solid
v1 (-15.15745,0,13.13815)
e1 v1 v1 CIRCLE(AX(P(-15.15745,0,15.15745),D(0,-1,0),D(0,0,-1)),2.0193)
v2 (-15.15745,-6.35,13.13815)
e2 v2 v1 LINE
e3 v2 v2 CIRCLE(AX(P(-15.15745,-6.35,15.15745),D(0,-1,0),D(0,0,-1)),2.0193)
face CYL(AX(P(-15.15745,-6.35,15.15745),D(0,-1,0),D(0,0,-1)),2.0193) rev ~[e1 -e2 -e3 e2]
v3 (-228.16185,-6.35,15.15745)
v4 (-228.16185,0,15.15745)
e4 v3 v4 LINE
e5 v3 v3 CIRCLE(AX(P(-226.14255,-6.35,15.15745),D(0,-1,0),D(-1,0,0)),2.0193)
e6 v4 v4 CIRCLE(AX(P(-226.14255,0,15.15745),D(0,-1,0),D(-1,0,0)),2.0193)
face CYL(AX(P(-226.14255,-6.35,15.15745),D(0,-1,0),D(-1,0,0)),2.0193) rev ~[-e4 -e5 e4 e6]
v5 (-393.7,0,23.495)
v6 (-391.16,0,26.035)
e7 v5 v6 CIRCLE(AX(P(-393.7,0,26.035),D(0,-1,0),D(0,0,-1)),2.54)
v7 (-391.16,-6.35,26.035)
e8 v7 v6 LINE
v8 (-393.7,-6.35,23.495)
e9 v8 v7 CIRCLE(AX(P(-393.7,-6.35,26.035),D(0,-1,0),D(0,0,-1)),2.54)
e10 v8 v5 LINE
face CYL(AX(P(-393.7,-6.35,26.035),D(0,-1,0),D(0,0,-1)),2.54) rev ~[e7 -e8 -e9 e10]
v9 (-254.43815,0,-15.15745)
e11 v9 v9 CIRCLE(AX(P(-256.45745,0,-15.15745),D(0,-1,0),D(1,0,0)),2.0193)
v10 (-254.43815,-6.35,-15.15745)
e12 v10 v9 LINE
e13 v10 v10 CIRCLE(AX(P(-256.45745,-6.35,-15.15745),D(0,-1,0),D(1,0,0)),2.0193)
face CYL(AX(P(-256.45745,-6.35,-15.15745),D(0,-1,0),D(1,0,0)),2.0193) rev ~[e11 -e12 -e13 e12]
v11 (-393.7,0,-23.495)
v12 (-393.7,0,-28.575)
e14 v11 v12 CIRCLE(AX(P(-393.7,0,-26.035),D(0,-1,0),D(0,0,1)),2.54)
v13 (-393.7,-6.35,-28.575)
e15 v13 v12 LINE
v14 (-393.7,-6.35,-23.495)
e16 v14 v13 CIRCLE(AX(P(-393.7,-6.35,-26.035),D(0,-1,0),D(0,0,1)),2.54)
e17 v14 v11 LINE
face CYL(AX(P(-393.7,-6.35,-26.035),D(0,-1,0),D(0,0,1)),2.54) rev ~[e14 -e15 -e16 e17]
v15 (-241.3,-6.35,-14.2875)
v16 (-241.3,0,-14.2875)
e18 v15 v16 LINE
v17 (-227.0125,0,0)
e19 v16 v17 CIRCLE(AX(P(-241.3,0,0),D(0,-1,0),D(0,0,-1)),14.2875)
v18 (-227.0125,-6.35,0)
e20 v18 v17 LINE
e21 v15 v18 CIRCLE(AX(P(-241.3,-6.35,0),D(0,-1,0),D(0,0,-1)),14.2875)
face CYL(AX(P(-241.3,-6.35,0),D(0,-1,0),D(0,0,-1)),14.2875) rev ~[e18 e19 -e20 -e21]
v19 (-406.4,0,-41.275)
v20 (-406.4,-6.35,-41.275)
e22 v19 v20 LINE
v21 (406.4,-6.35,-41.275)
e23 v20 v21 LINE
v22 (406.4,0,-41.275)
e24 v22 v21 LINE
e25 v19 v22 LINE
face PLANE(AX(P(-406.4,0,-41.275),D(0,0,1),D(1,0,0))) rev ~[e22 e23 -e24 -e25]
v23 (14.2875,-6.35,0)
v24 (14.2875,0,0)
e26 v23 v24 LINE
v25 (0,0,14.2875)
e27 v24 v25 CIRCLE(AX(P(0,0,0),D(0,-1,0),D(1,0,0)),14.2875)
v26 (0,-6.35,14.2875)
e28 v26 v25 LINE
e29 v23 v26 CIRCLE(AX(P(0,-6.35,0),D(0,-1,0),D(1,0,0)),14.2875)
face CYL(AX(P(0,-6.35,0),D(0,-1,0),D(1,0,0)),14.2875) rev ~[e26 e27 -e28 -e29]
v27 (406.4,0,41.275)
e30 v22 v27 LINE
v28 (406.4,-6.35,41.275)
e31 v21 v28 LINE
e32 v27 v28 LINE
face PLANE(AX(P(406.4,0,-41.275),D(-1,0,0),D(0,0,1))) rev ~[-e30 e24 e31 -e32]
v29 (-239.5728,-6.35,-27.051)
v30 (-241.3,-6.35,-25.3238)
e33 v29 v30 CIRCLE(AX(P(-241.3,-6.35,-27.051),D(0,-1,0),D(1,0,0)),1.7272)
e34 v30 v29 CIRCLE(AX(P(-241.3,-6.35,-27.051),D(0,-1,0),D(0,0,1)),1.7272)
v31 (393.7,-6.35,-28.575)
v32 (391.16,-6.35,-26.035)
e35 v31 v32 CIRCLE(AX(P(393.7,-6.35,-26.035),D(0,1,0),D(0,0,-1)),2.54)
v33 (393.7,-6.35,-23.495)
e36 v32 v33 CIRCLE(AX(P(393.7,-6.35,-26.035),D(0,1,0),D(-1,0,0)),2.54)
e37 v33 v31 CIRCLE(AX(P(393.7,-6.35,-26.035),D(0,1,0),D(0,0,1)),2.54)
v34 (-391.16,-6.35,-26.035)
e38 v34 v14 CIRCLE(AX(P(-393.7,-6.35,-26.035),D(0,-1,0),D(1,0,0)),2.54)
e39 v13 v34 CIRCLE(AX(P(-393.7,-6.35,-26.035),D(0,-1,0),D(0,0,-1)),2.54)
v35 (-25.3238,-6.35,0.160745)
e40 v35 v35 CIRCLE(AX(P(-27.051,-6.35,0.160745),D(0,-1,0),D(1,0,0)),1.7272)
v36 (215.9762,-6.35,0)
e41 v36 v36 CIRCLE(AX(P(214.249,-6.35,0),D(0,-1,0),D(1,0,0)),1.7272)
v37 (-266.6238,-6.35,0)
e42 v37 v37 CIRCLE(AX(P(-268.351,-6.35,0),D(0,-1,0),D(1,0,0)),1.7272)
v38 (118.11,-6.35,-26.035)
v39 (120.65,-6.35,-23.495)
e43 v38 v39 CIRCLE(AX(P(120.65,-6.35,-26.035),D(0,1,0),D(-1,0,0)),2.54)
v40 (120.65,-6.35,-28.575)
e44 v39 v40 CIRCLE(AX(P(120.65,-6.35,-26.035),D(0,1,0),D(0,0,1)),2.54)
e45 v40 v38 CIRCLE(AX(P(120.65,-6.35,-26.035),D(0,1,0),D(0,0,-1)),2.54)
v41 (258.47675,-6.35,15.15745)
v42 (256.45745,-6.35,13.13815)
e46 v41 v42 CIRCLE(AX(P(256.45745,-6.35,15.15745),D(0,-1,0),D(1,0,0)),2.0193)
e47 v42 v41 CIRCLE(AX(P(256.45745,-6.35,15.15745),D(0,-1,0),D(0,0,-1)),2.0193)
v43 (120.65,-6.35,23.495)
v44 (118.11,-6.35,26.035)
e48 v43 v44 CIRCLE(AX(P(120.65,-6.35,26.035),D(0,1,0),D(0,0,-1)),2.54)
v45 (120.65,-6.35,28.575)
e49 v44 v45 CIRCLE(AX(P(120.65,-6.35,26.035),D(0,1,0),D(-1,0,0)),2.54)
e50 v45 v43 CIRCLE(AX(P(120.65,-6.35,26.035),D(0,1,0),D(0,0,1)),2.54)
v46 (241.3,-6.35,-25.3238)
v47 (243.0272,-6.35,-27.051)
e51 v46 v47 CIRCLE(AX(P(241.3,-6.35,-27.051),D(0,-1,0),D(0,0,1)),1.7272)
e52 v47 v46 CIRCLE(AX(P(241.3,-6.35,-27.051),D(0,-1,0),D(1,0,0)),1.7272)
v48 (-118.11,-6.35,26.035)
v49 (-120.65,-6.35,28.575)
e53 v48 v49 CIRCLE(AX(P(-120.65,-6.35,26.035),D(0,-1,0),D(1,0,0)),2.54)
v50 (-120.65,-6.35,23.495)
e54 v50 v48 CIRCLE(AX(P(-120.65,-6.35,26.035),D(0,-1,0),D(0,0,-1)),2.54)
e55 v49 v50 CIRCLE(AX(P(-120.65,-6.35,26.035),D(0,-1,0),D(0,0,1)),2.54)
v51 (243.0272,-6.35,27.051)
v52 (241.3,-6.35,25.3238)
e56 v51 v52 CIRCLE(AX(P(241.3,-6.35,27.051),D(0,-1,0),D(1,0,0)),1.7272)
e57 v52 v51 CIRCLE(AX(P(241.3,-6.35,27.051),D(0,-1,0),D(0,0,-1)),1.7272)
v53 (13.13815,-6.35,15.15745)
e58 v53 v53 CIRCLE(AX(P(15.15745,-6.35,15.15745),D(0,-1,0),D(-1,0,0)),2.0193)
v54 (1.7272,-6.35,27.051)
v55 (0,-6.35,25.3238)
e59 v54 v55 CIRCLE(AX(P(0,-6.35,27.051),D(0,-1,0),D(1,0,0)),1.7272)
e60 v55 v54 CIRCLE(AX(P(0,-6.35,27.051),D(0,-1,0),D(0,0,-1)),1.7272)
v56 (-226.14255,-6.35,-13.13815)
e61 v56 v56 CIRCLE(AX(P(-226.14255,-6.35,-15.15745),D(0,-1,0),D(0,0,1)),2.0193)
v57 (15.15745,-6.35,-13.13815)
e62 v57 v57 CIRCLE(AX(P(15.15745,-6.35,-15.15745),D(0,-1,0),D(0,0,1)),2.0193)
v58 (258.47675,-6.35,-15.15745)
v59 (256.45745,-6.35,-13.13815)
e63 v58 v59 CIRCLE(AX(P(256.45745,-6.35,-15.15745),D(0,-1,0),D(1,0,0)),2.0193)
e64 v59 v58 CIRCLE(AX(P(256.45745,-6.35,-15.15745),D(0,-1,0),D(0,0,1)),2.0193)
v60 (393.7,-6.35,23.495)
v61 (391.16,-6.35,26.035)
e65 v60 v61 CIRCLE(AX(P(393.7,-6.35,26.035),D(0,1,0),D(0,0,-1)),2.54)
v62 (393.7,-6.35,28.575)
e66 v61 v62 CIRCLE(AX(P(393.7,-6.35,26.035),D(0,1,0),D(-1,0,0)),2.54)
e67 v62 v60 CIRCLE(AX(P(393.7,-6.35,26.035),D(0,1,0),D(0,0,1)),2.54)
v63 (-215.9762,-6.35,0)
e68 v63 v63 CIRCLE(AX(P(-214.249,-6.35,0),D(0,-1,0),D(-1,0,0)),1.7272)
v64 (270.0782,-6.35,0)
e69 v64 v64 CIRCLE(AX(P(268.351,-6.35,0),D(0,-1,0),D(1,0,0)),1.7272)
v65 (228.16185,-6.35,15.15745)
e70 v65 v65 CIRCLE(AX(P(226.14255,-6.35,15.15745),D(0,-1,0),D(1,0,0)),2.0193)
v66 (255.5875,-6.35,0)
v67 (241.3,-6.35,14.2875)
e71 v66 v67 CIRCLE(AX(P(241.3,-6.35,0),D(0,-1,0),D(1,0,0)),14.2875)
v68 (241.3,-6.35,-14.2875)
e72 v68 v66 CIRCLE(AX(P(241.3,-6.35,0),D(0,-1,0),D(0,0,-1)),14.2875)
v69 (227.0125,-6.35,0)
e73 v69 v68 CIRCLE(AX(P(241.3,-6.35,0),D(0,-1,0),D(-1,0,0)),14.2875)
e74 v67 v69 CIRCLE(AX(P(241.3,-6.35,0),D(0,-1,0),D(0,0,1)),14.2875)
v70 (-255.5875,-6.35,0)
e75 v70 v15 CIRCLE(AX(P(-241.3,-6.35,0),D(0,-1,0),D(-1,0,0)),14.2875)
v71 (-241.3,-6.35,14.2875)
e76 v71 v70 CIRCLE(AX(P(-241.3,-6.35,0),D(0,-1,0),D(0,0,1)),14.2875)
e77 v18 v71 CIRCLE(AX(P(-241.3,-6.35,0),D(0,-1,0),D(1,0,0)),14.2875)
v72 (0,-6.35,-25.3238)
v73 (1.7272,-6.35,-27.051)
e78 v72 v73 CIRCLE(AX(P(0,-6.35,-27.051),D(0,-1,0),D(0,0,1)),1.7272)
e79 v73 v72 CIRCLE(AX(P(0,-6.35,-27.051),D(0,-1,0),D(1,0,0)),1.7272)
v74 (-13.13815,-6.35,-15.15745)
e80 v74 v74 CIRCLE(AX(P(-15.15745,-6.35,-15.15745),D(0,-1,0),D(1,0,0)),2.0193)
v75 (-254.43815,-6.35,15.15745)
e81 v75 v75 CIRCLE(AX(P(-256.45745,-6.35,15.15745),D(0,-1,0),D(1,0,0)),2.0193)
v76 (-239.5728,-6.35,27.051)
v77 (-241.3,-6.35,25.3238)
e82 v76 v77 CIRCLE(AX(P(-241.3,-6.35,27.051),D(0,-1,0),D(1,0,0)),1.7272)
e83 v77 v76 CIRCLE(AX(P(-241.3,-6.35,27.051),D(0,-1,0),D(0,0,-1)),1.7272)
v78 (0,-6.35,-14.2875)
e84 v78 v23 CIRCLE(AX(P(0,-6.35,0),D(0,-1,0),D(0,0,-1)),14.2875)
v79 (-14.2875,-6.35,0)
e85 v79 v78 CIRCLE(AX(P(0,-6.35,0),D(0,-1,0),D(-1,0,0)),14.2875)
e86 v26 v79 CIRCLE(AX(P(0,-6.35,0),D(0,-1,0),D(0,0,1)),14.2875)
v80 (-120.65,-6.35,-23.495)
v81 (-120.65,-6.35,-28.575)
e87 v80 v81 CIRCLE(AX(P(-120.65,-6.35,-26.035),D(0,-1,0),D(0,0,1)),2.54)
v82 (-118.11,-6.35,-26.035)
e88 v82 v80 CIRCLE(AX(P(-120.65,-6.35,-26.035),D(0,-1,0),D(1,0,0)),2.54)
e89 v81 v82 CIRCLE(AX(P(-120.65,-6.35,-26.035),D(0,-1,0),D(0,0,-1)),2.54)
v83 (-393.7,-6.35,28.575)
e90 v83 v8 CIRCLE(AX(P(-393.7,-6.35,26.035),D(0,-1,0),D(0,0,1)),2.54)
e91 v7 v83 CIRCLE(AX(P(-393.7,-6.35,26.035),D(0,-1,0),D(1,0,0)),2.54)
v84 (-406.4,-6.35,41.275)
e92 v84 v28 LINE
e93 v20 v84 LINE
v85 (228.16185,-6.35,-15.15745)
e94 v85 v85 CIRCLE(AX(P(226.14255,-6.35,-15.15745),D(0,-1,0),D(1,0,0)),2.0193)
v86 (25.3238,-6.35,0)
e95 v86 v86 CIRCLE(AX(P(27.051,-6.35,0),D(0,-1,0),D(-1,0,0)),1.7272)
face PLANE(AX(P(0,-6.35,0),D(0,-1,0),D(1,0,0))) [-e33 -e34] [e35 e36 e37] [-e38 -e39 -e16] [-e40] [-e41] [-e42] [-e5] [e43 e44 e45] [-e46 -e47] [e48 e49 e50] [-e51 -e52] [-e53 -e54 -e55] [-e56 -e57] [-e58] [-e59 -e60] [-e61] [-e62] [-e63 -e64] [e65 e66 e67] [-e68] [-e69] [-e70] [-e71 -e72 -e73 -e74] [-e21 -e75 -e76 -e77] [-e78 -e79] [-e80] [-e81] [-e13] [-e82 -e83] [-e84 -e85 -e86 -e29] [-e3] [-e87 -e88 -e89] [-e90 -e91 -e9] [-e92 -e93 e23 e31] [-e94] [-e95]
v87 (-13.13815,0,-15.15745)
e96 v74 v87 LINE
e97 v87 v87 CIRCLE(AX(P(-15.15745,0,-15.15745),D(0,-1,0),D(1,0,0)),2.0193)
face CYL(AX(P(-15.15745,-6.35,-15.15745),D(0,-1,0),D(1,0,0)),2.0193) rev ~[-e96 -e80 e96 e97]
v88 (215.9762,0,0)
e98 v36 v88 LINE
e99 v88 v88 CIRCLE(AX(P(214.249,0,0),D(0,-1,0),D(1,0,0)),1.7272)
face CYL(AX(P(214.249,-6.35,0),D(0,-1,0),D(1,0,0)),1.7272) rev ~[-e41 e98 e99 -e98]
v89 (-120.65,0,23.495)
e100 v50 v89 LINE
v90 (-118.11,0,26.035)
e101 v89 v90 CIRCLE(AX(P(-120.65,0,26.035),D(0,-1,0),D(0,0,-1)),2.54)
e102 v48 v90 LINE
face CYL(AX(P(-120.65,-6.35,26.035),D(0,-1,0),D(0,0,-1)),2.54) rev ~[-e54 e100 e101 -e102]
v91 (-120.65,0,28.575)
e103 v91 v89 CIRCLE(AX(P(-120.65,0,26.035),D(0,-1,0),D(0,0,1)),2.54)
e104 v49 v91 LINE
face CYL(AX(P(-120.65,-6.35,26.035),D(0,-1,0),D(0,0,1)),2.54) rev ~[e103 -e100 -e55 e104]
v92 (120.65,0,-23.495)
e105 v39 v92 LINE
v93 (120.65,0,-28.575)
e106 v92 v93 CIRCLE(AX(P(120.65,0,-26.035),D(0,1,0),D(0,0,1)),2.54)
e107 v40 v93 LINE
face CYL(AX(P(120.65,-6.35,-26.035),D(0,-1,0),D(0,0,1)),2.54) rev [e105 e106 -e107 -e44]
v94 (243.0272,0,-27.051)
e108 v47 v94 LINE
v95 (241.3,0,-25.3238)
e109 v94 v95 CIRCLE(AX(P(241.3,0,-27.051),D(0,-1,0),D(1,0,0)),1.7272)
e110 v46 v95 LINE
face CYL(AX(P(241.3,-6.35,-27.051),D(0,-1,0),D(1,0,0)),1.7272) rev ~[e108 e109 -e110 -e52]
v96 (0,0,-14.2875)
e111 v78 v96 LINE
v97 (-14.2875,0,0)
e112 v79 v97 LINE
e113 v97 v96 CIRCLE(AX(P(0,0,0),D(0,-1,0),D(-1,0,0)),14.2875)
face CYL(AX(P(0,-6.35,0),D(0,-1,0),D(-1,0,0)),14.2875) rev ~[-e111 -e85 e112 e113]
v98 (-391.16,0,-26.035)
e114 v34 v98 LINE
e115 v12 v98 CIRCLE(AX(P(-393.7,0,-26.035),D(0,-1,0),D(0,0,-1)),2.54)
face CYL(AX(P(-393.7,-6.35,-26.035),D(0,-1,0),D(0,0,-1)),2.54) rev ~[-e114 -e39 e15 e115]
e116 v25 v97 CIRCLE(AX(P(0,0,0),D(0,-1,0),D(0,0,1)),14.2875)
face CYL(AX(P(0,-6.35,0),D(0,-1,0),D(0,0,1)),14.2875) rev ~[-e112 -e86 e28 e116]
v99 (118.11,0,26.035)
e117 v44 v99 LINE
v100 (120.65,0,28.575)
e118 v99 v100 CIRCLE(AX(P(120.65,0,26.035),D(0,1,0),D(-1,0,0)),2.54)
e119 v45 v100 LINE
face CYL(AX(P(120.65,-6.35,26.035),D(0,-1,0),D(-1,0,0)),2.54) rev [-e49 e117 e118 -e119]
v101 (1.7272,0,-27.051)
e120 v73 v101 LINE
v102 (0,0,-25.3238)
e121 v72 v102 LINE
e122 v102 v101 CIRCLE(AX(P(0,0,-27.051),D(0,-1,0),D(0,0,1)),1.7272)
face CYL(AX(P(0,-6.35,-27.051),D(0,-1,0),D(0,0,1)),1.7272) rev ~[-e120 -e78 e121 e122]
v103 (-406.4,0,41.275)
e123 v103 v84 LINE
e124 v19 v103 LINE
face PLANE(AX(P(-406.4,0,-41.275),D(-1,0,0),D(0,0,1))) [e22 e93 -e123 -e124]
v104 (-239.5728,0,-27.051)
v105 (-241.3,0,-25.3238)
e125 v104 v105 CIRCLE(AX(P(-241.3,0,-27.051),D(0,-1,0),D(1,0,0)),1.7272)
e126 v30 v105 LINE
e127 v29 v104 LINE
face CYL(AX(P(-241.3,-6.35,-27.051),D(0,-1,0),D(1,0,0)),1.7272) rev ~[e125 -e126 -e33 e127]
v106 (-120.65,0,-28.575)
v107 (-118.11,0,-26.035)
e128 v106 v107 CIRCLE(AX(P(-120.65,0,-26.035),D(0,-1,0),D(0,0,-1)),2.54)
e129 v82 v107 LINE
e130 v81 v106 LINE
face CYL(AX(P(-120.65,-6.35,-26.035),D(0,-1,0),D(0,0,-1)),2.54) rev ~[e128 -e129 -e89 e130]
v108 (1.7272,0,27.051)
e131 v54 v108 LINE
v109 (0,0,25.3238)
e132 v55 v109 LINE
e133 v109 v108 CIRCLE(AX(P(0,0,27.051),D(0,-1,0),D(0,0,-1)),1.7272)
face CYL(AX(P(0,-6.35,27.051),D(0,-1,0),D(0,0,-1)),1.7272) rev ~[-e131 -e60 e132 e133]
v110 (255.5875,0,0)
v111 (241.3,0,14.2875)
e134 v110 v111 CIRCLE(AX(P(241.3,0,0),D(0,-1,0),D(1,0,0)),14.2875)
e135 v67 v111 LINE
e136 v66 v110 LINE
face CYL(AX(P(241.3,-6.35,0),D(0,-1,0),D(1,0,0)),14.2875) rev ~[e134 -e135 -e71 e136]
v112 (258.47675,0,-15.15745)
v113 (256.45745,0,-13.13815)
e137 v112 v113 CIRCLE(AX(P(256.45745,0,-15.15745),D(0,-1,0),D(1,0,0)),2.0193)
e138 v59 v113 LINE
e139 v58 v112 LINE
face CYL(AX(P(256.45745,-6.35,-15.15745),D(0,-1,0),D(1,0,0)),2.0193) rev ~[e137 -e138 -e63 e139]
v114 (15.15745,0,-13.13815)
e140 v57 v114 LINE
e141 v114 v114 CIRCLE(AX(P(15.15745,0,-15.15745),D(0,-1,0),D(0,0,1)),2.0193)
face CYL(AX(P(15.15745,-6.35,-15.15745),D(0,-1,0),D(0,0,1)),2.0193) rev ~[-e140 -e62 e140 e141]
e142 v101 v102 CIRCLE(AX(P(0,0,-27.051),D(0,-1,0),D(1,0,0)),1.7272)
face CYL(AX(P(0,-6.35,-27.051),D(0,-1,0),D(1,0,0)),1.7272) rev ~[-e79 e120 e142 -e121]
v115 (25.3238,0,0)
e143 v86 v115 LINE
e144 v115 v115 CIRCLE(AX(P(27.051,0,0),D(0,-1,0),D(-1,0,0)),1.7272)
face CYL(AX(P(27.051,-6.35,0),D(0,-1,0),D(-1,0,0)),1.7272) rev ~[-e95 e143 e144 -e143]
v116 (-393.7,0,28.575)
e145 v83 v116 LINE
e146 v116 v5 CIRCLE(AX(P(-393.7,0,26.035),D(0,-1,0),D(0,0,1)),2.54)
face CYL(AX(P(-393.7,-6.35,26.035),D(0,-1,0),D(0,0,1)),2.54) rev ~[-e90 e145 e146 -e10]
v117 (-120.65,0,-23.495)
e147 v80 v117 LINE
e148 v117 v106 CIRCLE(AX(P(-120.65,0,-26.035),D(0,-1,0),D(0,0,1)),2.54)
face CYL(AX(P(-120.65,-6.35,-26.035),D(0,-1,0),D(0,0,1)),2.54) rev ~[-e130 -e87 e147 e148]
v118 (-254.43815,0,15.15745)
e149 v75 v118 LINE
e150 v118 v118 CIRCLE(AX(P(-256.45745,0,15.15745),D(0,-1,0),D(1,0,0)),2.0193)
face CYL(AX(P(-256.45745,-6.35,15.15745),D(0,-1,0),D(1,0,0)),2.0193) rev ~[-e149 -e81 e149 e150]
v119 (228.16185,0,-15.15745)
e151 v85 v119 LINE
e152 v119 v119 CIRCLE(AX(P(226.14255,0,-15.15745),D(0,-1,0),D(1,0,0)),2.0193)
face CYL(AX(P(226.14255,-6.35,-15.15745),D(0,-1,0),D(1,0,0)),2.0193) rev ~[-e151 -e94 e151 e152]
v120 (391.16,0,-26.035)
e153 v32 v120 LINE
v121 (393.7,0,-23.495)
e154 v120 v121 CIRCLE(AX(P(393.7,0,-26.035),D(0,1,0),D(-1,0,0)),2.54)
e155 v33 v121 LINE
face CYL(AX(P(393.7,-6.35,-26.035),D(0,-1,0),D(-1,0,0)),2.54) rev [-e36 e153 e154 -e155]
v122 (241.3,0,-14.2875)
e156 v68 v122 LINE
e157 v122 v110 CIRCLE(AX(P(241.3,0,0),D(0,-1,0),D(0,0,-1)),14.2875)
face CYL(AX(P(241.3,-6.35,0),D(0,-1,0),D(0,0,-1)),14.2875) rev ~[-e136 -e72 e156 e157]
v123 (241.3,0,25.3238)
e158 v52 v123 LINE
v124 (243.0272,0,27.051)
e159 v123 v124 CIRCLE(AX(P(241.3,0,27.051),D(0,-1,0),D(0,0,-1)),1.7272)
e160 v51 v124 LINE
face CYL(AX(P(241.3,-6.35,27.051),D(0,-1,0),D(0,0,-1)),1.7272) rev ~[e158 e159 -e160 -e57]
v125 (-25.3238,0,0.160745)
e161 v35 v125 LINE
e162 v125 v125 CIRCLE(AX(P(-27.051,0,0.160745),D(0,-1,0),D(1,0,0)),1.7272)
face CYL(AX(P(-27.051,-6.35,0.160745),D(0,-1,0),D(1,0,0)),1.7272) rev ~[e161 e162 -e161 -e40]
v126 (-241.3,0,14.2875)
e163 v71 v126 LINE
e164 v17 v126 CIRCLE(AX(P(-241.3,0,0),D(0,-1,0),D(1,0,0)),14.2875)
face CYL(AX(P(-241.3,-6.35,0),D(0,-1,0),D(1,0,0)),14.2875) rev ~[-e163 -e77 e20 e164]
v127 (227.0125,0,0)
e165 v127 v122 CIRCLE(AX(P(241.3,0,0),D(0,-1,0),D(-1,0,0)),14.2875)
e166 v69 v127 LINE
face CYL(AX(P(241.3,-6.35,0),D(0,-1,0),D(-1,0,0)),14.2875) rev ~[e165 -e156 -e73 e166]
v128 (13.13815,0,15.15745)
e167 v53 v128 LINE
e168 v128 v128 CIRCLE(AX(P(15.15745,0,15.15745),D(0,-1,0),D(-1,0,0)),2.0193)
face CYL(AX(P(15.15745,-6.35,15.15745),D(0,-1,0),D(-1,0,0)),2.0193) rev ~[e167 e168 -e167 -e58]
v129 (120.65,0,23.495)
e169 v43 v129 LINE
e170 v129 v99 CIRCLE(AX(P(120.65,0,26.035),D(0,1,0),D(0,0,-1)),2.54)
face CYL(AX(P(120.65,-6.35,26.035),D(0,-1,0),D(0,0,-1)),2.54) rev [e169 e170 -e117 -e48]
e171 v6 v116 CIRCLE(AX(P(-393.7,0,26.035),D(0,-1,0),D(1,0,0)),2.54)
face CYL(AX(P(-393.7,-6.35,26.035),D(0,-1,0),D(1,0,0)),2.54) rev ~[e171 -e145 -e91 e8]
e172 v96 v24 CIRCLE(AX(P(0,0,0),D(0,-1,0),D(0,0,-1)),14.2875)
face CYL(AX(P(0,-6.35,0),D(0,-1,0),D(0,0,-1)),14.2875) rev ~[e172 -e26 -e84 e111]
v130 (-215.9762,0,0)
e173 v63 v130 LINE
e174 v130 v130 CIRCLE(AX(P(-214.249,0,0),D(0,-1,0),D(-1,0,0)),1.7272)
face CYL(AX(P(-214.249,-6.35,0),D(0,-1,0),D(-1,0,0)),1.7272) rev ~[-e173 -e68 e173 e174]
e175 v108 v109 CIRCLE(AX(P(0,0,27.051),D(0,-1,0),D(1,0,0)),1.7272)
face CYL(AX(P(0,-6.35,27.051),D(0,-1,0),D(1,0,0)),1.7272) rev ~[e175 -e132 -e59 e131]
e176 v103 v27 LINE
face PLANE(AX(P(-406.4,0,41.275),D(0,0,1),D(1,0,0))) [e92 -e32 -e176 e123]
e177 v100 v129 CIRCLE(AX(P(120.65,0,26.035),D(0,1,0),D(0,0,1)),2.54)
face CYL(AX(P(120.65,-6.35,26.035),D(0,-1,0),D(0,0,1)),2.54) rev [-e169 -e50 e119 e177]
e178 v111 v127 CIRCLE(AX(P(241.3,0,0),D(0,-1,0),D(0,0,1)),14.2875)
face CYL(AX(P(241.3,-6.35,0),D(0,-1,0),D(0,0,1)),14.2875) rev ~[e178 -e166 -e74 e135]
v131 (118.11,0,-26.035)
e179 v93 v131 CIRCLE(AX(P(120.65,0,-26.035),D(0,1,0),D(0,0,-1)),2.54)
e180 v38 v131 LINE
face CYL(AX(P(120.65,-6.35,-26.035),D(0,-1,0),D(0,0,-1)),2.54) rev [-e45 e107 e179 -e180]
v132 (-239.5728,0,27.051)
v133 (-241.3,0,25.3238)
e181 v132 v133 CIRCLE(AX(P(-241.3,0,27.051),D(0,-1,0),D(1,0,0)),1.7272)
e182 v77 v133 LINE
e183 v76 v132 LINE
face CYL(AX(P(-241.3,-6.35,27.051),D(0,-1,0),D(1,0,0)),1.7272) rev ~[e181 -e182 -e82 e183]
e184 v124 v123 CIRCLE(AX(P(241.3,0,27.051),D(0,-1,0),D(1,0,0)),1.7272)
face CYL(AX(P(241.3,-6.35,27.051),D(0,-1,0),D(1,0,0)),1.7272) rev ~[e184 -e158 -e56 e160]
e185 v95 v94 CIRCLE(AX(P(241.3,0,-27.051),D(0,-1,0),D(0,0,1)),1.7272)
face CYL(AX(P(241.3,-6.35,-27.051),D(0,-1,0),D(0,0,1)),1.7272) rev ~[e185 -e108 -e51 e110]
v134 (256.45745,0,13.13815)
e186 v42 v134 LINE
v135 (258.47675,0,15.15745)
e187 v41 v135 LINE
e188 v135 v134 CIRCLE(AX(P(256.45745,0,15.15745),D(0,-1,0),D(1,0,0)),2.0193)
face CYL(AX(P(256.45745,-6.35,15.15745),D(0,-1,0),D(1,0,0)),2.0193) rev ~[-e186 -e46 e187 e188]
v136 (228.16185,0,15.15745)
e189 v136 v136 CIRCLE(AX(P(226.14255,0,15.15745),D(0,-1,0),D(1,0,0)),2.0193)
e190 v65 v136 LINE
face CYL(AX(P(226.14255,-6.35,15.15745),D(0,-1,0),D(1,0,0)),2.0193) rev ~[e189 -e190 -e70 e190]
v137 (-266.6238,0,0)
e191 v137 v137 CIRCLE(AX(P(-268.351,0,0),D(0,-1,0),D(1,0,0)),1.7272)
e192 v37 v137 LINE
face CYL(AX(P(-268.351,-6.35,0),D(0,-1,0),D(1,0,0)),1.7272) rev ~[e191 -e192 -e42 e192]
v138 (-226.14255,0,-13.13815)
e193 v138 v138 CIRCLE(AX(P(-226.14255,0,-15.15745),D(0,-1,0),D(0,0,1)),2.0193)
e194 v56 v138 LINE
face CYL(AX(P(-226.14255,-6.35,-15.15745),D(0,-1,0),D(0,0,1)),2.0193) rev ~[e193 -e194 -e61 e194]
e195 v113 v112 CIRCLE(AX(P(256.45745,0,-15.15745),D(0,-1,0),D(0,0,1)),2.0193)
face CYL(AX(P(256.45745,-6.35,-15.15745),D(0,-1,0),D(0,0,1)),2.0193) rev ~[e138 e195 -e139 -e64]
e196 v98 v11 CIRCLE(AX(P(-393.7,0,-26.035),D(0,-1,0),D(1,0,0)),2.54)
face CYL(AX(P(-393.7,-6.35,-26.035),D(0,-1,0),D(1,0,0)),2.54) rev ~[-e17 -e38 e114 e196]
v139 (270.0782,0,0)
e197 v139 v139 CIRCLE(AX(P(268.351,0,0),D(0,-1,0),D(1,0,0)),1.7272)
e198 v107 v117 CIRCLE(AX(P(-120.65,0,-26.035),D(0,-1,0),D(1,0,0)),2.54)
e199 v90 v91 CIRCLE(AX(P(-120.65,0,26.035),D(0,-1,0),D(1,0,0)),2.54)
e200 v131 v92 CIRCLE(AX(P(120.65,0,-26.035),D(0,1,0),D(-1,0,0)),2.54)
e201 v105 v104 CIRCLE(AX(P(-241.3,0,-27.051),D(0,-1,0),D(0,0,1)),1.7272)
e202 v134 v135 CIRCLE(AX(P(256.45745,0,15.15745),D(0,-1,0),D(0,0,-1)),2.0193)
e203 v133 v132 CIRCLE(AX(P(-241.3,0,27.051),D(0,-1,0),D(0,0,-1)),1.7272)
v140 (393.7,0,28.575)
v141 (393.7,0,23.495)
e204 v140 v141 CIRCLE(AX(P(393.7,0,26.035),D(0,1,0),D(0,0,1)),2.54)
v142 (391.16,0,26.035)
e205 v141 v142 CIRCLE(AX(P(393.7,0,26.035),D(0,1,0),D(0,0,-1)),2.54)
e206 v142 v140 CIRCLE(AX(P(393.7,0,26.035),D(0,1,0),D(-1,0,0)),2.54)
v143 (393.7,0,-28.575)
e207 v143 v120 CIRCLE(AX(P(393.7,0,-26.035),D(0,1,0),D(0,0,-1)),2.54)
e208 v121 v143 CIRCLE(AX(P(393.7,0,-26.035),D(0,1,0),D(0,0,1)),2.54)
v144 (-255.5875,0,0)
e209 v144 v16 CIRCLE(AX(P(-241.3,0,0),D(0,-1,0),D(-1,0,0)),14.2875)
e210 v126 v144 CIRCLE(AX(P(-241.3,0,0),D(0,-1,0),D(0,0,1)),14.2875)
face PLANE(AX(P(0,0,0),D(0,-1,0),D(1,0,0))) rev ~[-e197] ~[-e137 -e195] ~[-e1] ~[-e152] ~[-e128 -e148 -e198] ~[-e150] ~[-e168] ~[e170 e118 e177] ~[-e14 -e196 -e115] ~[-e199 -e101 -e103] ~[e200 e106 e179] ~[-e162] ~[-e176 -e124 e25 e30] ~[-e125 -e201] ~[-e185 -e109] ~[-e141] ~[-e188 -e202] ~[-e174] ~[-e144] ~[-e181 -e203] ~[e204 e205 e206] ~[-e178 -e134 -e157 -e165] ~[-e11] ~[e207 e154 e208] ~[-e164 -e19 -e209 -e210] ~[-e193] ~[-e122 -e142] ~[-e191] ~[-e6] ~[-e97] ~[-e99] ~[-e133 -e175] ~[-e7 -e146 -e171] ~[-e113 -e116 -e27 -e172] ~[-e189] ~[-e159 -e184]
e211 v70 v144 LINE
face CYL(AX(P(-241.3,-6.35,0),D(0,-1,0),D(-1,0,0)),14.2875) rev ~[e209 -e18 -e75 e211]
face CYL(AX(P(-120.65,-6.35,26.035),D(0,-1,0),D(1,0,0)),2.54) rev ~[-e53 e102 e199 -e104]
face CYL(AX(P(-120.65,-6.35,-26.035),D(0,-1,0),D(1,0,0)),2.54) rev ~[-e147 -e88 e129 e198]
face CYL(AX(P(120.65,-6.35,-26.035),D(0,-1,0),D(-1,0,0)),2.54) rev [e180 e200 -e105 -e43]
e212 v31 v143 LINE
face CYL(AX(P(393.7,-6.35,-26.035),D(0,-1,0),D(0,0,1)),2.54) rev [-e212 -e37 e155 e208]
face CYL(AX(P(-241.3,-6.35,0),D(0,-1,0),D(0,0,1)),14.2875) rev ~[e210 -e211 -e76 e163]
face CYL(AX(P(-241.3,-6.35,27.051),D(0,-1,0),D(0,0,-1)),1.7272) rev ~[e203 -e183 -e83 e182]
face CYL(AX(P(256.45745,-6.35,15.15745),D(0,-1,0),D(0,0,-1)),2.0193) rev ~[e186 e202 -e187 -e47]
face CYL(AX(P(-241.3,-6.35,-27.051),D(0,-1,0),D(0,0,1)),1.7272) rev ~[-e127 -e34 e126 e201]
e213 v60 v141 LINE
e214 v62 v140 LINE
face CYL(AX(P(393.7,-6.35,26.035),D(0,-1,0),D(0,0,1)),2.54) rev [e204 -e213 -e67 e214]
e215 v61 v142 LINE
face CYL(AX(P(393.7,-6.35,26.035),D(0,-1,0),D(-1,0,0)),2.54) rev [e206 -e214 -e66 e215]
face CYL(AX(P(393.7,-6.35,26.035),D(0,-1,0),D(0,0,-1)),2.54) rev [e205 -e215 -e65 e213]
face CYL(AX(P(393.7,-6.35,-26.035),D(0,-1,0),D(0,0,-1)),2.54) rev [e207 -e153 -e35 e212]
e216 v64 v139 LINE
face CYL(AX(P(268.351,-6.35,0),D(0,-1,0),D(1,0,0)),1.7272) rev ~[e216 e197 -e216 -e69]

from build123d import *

# Parameters (mm, degrees)
F0_W     = 812.8
F0_H     = 82.55
F1_DEPTH = 6.35
F2_R     = 1.7272
F3_DEPTH = 6.35
F5_DEPTH = 6.35


# Not quite as in the source:
# - a pattern or mirror of a feature is missing from the dataset's text; its kind, count and spacing are read off the source's solid


with BuildPart() as f1:
    # F0 (on Front) → F1 (new body)
    with BuildSketch(Plane.XZ):
        Rectangle(F0_W, F0_H)
    extrude(amount=F1_DEPTH)

    # F2 (on face) → F3 (cut, through all)
    with BuildSketch(Plane.XZ.offset(6.35)):
        with BuildLine():
            Line((-227.0125, 0), (-241.3, 0))
            Line((-241.3, 0), (-241.3, -14.2875))
            ThreePointArc((-241.3, -14.2875), (-231.1972118638, -10.1027881362), (-227.0125, 0))
        make_face()
        with BuildLine():
            Line((-241.3, 14.2875), (-241.3, 0))
            Line((-241.3, 0), (-227.0125, 0))
            ThreePointArc((-227.0125, 0), (-231.1972118638, 10.1027881362), (-241.3, 14.2875))
        make_face()
        with BuildLine():
            ThreePointArc((-241.3, 14.2875), (-251.4027881362, 10.1027881362), (-255.5875, 0))
            Line((-255.5875, 0), (-241.3, 0))
            Line((-241.3, 0), (-241.3, 14.2875))
        make_face()
        with BuildLine():
            Line((-241.3, 0), (-255.5875, 0))
            ThreePointArc((-255.5875, 0), (-251.4027881362, -10.1027881362), (-241.3, -14.2875))
            Line((-241.3, -14.2875), (-241.3, 0))
        make_face()
        with BuildLine():
            Line((-256.45745, -15.15745), (-256.45745, -13.13815))
            ThreePointArc((-256.45745, -13.13815), (-257.8853107233, -16.5853107232), (-254.43815, -15.15745))
            Line((-254.43815, -15.15745), (-256.45745, -15.15745))
        make_face()
        with BuildLine():
            ThreePointArc((-254.43815, -15.15745), (-255.0295892767, -13.7295892768), (-256.45745, -13.13815))
            Line((-256.45745, -13.13815), (-256.45745, -15.15745))
            Line((-256.45745, -15.15745), (-254.43815, -15.15745))
        make_face()
        with BuildLine():
            ThreePointArc((-239.5728, -27.051), (-240.0786851675, -25.8296851675), (-241.3, -25.3238))
            ThreePointArc((-241.3, -25.3238), (-242.5213148325, -28.2723148325), (-239.5728, -27.051))
        make_face()
        with BuildLine():
            Line((-226.14255, -15.15745), (-228.16185, -15.15745))
            ThreePointArc((-228.16185, -15.15745), (-226.14255, -17.17675), (-224.12325, -15.15745))
            ThreePointArc((-224.12325, -15.15745), (-224.7146892767, -13.7295892768), (-226.14255, -13.13815))
            Line((-226.14255, -13.13815), (-226.14255, -15.15745))
        make_face()
        with BuildLine():
            ThreePointArc((-226.14255, -13.13815), (-227.5704107232, -13.7295892767), (-228.16185, -15.15745))
            Line((-228.16185, -15.15745), (-226.14255, -15.15745))
            Line((-226.14255, -15.15745), (-226.14255, -13.13815))
        make_face()
        with BuildLine():
            ThreePointArc((-224.12325, 15.15745), (-226.14255, 17.17675), (-228.16185, 15.15745))
            Line((-228.16185, 15.15745), (-226.14255, 15.15745))
            Line((-226.14255, 15.15745), (-226.14255, 13.13815))
            ThreePointArc((-226.14255, 13.13815), (-224.7146892767, 13.7295892768), (-224.12325, 15.15745))
        make_face()
        with BuildLine():
            Line((-226.14255, 15.15745), (-228.16185, 15.15745))
            ThreePointArc((-228.16185, 15.15745), (-227.5704107232, 13.7295892767), (-226.14255, 13.13815))
            Line((-226.14255, 13.13815), (-226.14255, 15.15745))
        make_face()
        with BuildLine():
            ThreePointArc((-212.5218, 0), (-214.249, 1.7272), (-215.9762, 0))
            ThreePointArc((-215.9762, 0), (-214.249, -1.7272), (-212.5218, 0))
        make_face()
        with BuildLine():
            ThreePointArc((-239.5728, 27.051), (-242.5213148325, 28.2723148325), (-241.3, 25.3238))
            ThreePointArc((-241.3, 25.3238), (-240.0786851675, 25.8296851675), (-239.5728, 27.051))
        make_face()
        with BuildLine():
            Line((-256.45745, 15.15745), (-256.45745, 13.13815))
            ThreePointArc((-256.45745, 13.13815), (-255.0295892767, 13.7295892768), (-254.43815, 15.15745))
            Line((-254.43815, 15.15745), (-256.45745, 15.15745))
        make_face()
        with BuildLine():
            ThreePointArc((-254.43815, 15.15745), (-257.8853107233, 16.5853107232), (-256.45745, 13.13815))
            Line((-256.45745, 13.13815), (-256.45745, 15.15745))
            Line((-256.45745, 15.15745), (-254.43815, 15.15745))
        make_face()
        with BuildLine():
            ThreePointArc((-270.0782, 0), (-268.351, -1.7272), (-266.6238, 0))
            Line((-266.6238, 0), (-270.0782, 0))
        make_face()
        with BuildLine():
            Line((-270.0782, 0), (-266.6238, 0))
            ThreePointArc((-266.6238, 0), (-268.351, 1.7272), (-270.0782, 0))
        make_face()
        with BuildLine():
            Line((14.2875, 0), (0, 0))
            Line((0, 0), (0, -14.2875))
            ThreePointArc((0, -14.2875), (10.1027881362, -10.1027881362), (14.2875, 0))
        make_face()
        with BuildLine():
            Line((0, -14.2875), (0, 0))
            Line((0, 0), (-14.2875, 0))
            ThreePointArc((-14.2875, 0), (-10.1027881362, -10.1027881362), (0, -14.2875))
        make_face()
        with BuildLine():
            Line((-14.2875, 0), (0, 0))
            Line((0, 0), (0, 14.2875))
            ThreePointArc((0, 14.2875), (-10.1027881362, 10.1027881362), (-14.2875, 0))
        make_face()
        with BuildLine():
            Line((0, 14.2875), (0, 0))
            Line((0, 0), (14.2875, 0))
            ThreePointArc((14.2875, 0), (10.1027881362, 10.1027881362), (0, 14.2875))
        make_face()
        with BuildLine():
            Line((15.15745, 15.15745), (15.15745, 13.13815))
            ThreePointArc((15.15745, 13.13815), (16.5853107233, 13.7295892768), (17.17675, 15.15745))
            ThreePointArc((17.17675, 15.15745), (15.15745, 17.17675), (13.13815, 15.15745))
            Line((13.13815, 15.15745), (15.15745, 15.15745))
        make_face()
        with BuildLine():
            ThreePointArc((13.13815, 15.15745), (13.7295892768, 13.7295892767), (15.15745, 13.13815))
            Line((15.15745, 13.13815), (15.15745, 15.15745))
            Line((15.15745, 15.15745), (13.13815, 15.15745))
        make_face()
        with BuildLine():
            ThreePointArc((1.7272, 27.051), (-1.2213148325, 28.2723148325), (0, 25.3238))
            ThreePointArc((0, 25.3238), (1.2213148325, 25.8296851675), (1.7272, 27.051))
        make_face()
        with BuildLine():
            Line((-15.15745, 15.15745), (-13.13815, 15.15745))
            ThreePointArc((-13.13815, 15.15745), (-16.5853107233, 16.5853107232), (-15.15745, 13.13815))
            Line((-15.15745, 13.13815), (-15.15745, 15.15745))
        make_face()
        with BuildLine():
            ThreePointArc((-15.15745, 13.13815), (-13.7295892767, 13.7295892768), (-13.13815, 15.15745))
            Line((-13.13815, 15.15745), (-15.15745, 15.15745))
            Line((-15.15745, 15.15745), (-15.15745, 13.13815))
        make_face()
        with BuildLine():
            ThreePointArc((-15.15745, -13.13815), (-16.5853107233, -16.5853107232), (-13.13815, -15.15745))
            Line((-13.13815, -15.15745), (-15.15745, -15.15745))
            Line((-15.15745, -15.15745), (-15.15745, -13.13815))
        make_face()
        with BuildLine():
            Line((-15.15745, -15.15745), (-13.13815, -15.15745))
            ThreePointArc((-13.13815, -15.15745), (-13.7295892767, -13.7295892768), (-15.15745, -13.13815))
            Line((-15.15745, -13.13815), (-15.15745, -15.15745))
        make_face()
        with BuildLine():
            ThreePointArc((1.7272, -27.051), (1.2213148325, -25.8296851675), (0, -25.3238))
            ThreePointArc((0, -25.3238), (-1.2213148325, -28.2723148325), (1.7272, -27.051))
        make_face()
        with BuildLine():
            ThreePointArc((17.17675, -15.15745), (16.5853107233, -13.7295892768), (15.15745, -13.13815))
            Line((15.15745, -13.13815), (15.15745, -15.15745))
            Line((15.15745, -15.15745), (13.13815, -15.15745))
            ThreePointArc((13.13815, -15.15745), (15.15745, -17.17675), (17.17675, -15.15745))
        make_face()
        with BuildLine():
            Line((15.15745, -15.15745), (15.15745, -13.13815))
            ThreePointArc((15.15745, -13.13815), (13.7295892768, -13.7295892767), (13.13815, -15.15745))
            Line((13.13815, -15.15745), (15.15745, -15.15745))
        make_face()
        with Locations((-27.051, 0.1607450395)):
            Circle(F2_R)
        with BuildLine():
            ThreePointArc((28.7782, 0), (27.051, 1.7272), (25.3238, 0))
            ThreePointArc((25.3238, 0), (27.051, -1.7272), (28.7782, 0))
        make_face()
        with BuildLine():
            ThreePointArc((241.3, -14.2875), (251.4027881362, -10.1027881362), (255.5875, 0))
            Line((255.5875, 0), (241.3, 0))
            Line((241.3, 0), (241.3, -14.2875))
        make_face()
        with BuildLine():
            Line((241.3, 0), (255.5875, 0))
            ThreePointArc((255.5875, 0), (251.4027881362, 10.1027881362), (241.3, 14.2875))
            Line((241.3, 14.2875), (241.3, 0))
        make_face()
        with BuildLine():
            Line((227.0125, 0), (241.3, 0))
            Line((241.3, 0), (241.3, 14.2875))
            ThreePointArc((241.3, 14.2875), (231.1972118638, 10.1027881362), (227.0125, 0))
        make_face()
        with BuildLine():
            Line((241.3, -14.2875), (241.3, 0))
            Line((241.3, 0), (227.0125, 0))
            ThreePointArc((227.0125, 0), (231.1972118638, -10.1027881362), (241.3, -14.2875))
        make_face()
        with BuildLine():
            ThreePointArc((258.47675, -15.15745), (257.8853107232, -13.7295892768), (256.45745, -13.13815))
            Line((256.45745, -13.13815), (256.45745, -15.15745))
            Line((256.45745, -15.15745), (254.43815, -15.15745))
            ThreePointArc((254.43815, -15.15745), (256.45745, -17.17675), (258.47675, -15.15745))
        make_face()
        with BuildLine():
            Line((256.45745, -15.15745), (256.45745, -13.13815))
            ThreePointArc((256.45745, -13.13815), (255.0295892767, -13.7295892768), (254.43815, -15.15745))
            Line((254.43815, -15.15745), (256.45745, -15.15745))
        make_face()
        with BuildLine():
            ThreePointArc((243.0272, -27.051), (242.5213148325, -25.8296851675), (241.3, -25.3238))
            ThreePointArc((241.3, -25.3238), (240.0786851675, -28.2723148325), (243.0272, -27.051))
        make_face()
        with BuildLine():
            ThreePointArc((266.6238, 0), (268.351, -1.7272), (270.0782, 0))
            Line((270.0782, 0), (266.6238, 0))
        make_face()
        with BuildLine():
            Line((266.6238, 0), (270.0782, 0))
            ThreePointArc((270.0782, 0), (268.351, 1.7272), (266.6238, 0))
        make_face()
        with BuildLine():
            Line((256.45745, 15.15745), (256.45745, 13.13815))
            ThreePointArc((256.45745, 13.13815), (257.8853107232, 13.7295892768), (258.47675, 15.15745))
            ThreePointArc((258.47675, 15.15745), (256.45745, 17.17675), (254.43815, 15.15745))
            Line((254.43815, 15.15745), (256.45745, 15.15745))
        make_face()
        with BuildLine():
            ThreePointArc((254.43815, 15.15745), (255.0295892767, 13.7295892768), (256.45745, 13.13815))
            Line((256.45745, 13.13815), (256.45745, 15.15745))
            Line((256.45745, 15.15745), (254.43815, 15.15745))
        make_face()
        with BuildLine():
            ThreePointArc((243.0272, 27.051), (240.0786851675, 28.2723148325), (241.3, 25.3238))
            ThreePointArc((241.3, 25.3238), (242.5213148325, 25.8296851675), (243.0272, 27.051))
        make_face()
        with BuildLine():
            ThreePointArc((226.14255, 13.13815), (227.5704107233, 13.7295892768), (228.16185, 15.15745))
            Line((228.16185, 15.15745), (226.14255, 15.15745))
            Line((226.14255, 15.15745), (226.14255, 13.13815))
        make_face()
        with BuildLine():
            Line((226.14255, 15.15745), (228.16185, 15.15745))
            ThreePointArc((228.16185, 15.15745), (224.7146892767, 16.5853107232), (226.14255, 13.13815))
            Line((226.14255, 13.13815), (226.14255, 15.15745))
        make_face()
        with BuildLine():
            ThreePointArc((226.14255, -13.13815), (224.7146892767, -16.5853107232), (228.16185, -15.15745))
            Line((228.16185, -15.15745), (226.14255, -15.15745))
            Line((226.14255, -15.15745), (226.14255, -13.13815))
        make_face()
        with BuildLine():
            Line((226.14255, -15.15745), (228.16185, -15.15745))
            ThreePointArc((228.16185, -15.15745), (227.5704107233, -13.7295892768), (226.14255, -13.13815))
            Line((226.14255, -13.13815), (226.14255, -15.15745))
        make_face()
        with Locations((214.249, 0)):
            Circle(F2_R)
    extrude(amount=-F3_DEPTH, mode=Mode.SUBTRACT)

    # F4 (on face) → F5 (cut, through all)
    with BuildSketch(Plane.XZ.offset(6.35)):
        with BuildLine():
            ThreePointArc((-391.16, 26.035), (-391.9039487758, 27.8310512242), (-393.7, 28.575))
            Line((-393.7, 28.575), (-393.7, 23.495))
            ThreePointArc((-393.7, 23.495), (-391.9039487758, 24.2389487758), (-391.16, 26.035))
        make_face()
        with BuildLine():
            ThreePointArc((-391.16, -26.035), (-391.9039487758, -24.2389487758), (-393.7, -23.495))
            Line((-393.7, -23.495), (-393.7, -28.575))
            ThreePointArc((-393.7, -28.575), (-391.9039487758, -27.8310512242), (-391.16, -26.035))
        make_face()
        with BuildLine():
            Line((-393.7, -28.575), (-393.7, -23.495))
            ThreePointArc((-393.7, -23.495), (-396.24, -26.035), (-393.7, -28.575))
        make_face()
        with BuildLine():
            Line((-393.7, 23.495), (-393.7, 28.575))
            ThreePointArc((-393.7, 28.575), (-396.24, 26.035), (-393.7, 23.495))
        make_face()
        with BuildLine():
            ThreePointArc((-118.11, 26.035), (-118.8539487758, 27.8310512242), (-120.65, 28.575))
            Line((-120.65, 28.575), (-120.65, 23.495))
            ThreePointArc((-120.65, 23.495), (-118.8539487758, 24.2389487758), (-118.11, 26.035))
        make_face()
        with BuildLine():
            ThreePointArc((-118.11, -26.035), (-118.8539487758, -24.2389487758), (-120.65, -23.495))
            Line((-120.65, -23.495), (-120.65, -28.575))
            ThreePointArc((-120.65, -28.575), (-118.8539487758, -27.8310512242), (-118.11, -26.035))
        make_face()
        with BuildLine():
            Line((-120.65, -28.575), (-120.65, -23.495))
            ThreePointArc((-120.65, -23.495), (-123.19, -26.035), (-120.65, -28.575))
        make_face()
        with BuildLine():
            Line((-120.65, 23.495), (-120.65, 28.575))
            ThreePointArc((-120.65, 28.575), (-123.19, 26.035), (-120.65, 23.495))
        make_face()
    f5 = extrude(amount=-F5_DEPTH, mode=Mode.SUBTRACT)

    # F5_copies: F5 across plane
    add(f5.mirror(Plane(origin=(0, 0, 0), x_dir=(0, 0, 1), z_dir=(1, 0, 0))), mode=Mode.SUBTRACT)


solid = f1.part
